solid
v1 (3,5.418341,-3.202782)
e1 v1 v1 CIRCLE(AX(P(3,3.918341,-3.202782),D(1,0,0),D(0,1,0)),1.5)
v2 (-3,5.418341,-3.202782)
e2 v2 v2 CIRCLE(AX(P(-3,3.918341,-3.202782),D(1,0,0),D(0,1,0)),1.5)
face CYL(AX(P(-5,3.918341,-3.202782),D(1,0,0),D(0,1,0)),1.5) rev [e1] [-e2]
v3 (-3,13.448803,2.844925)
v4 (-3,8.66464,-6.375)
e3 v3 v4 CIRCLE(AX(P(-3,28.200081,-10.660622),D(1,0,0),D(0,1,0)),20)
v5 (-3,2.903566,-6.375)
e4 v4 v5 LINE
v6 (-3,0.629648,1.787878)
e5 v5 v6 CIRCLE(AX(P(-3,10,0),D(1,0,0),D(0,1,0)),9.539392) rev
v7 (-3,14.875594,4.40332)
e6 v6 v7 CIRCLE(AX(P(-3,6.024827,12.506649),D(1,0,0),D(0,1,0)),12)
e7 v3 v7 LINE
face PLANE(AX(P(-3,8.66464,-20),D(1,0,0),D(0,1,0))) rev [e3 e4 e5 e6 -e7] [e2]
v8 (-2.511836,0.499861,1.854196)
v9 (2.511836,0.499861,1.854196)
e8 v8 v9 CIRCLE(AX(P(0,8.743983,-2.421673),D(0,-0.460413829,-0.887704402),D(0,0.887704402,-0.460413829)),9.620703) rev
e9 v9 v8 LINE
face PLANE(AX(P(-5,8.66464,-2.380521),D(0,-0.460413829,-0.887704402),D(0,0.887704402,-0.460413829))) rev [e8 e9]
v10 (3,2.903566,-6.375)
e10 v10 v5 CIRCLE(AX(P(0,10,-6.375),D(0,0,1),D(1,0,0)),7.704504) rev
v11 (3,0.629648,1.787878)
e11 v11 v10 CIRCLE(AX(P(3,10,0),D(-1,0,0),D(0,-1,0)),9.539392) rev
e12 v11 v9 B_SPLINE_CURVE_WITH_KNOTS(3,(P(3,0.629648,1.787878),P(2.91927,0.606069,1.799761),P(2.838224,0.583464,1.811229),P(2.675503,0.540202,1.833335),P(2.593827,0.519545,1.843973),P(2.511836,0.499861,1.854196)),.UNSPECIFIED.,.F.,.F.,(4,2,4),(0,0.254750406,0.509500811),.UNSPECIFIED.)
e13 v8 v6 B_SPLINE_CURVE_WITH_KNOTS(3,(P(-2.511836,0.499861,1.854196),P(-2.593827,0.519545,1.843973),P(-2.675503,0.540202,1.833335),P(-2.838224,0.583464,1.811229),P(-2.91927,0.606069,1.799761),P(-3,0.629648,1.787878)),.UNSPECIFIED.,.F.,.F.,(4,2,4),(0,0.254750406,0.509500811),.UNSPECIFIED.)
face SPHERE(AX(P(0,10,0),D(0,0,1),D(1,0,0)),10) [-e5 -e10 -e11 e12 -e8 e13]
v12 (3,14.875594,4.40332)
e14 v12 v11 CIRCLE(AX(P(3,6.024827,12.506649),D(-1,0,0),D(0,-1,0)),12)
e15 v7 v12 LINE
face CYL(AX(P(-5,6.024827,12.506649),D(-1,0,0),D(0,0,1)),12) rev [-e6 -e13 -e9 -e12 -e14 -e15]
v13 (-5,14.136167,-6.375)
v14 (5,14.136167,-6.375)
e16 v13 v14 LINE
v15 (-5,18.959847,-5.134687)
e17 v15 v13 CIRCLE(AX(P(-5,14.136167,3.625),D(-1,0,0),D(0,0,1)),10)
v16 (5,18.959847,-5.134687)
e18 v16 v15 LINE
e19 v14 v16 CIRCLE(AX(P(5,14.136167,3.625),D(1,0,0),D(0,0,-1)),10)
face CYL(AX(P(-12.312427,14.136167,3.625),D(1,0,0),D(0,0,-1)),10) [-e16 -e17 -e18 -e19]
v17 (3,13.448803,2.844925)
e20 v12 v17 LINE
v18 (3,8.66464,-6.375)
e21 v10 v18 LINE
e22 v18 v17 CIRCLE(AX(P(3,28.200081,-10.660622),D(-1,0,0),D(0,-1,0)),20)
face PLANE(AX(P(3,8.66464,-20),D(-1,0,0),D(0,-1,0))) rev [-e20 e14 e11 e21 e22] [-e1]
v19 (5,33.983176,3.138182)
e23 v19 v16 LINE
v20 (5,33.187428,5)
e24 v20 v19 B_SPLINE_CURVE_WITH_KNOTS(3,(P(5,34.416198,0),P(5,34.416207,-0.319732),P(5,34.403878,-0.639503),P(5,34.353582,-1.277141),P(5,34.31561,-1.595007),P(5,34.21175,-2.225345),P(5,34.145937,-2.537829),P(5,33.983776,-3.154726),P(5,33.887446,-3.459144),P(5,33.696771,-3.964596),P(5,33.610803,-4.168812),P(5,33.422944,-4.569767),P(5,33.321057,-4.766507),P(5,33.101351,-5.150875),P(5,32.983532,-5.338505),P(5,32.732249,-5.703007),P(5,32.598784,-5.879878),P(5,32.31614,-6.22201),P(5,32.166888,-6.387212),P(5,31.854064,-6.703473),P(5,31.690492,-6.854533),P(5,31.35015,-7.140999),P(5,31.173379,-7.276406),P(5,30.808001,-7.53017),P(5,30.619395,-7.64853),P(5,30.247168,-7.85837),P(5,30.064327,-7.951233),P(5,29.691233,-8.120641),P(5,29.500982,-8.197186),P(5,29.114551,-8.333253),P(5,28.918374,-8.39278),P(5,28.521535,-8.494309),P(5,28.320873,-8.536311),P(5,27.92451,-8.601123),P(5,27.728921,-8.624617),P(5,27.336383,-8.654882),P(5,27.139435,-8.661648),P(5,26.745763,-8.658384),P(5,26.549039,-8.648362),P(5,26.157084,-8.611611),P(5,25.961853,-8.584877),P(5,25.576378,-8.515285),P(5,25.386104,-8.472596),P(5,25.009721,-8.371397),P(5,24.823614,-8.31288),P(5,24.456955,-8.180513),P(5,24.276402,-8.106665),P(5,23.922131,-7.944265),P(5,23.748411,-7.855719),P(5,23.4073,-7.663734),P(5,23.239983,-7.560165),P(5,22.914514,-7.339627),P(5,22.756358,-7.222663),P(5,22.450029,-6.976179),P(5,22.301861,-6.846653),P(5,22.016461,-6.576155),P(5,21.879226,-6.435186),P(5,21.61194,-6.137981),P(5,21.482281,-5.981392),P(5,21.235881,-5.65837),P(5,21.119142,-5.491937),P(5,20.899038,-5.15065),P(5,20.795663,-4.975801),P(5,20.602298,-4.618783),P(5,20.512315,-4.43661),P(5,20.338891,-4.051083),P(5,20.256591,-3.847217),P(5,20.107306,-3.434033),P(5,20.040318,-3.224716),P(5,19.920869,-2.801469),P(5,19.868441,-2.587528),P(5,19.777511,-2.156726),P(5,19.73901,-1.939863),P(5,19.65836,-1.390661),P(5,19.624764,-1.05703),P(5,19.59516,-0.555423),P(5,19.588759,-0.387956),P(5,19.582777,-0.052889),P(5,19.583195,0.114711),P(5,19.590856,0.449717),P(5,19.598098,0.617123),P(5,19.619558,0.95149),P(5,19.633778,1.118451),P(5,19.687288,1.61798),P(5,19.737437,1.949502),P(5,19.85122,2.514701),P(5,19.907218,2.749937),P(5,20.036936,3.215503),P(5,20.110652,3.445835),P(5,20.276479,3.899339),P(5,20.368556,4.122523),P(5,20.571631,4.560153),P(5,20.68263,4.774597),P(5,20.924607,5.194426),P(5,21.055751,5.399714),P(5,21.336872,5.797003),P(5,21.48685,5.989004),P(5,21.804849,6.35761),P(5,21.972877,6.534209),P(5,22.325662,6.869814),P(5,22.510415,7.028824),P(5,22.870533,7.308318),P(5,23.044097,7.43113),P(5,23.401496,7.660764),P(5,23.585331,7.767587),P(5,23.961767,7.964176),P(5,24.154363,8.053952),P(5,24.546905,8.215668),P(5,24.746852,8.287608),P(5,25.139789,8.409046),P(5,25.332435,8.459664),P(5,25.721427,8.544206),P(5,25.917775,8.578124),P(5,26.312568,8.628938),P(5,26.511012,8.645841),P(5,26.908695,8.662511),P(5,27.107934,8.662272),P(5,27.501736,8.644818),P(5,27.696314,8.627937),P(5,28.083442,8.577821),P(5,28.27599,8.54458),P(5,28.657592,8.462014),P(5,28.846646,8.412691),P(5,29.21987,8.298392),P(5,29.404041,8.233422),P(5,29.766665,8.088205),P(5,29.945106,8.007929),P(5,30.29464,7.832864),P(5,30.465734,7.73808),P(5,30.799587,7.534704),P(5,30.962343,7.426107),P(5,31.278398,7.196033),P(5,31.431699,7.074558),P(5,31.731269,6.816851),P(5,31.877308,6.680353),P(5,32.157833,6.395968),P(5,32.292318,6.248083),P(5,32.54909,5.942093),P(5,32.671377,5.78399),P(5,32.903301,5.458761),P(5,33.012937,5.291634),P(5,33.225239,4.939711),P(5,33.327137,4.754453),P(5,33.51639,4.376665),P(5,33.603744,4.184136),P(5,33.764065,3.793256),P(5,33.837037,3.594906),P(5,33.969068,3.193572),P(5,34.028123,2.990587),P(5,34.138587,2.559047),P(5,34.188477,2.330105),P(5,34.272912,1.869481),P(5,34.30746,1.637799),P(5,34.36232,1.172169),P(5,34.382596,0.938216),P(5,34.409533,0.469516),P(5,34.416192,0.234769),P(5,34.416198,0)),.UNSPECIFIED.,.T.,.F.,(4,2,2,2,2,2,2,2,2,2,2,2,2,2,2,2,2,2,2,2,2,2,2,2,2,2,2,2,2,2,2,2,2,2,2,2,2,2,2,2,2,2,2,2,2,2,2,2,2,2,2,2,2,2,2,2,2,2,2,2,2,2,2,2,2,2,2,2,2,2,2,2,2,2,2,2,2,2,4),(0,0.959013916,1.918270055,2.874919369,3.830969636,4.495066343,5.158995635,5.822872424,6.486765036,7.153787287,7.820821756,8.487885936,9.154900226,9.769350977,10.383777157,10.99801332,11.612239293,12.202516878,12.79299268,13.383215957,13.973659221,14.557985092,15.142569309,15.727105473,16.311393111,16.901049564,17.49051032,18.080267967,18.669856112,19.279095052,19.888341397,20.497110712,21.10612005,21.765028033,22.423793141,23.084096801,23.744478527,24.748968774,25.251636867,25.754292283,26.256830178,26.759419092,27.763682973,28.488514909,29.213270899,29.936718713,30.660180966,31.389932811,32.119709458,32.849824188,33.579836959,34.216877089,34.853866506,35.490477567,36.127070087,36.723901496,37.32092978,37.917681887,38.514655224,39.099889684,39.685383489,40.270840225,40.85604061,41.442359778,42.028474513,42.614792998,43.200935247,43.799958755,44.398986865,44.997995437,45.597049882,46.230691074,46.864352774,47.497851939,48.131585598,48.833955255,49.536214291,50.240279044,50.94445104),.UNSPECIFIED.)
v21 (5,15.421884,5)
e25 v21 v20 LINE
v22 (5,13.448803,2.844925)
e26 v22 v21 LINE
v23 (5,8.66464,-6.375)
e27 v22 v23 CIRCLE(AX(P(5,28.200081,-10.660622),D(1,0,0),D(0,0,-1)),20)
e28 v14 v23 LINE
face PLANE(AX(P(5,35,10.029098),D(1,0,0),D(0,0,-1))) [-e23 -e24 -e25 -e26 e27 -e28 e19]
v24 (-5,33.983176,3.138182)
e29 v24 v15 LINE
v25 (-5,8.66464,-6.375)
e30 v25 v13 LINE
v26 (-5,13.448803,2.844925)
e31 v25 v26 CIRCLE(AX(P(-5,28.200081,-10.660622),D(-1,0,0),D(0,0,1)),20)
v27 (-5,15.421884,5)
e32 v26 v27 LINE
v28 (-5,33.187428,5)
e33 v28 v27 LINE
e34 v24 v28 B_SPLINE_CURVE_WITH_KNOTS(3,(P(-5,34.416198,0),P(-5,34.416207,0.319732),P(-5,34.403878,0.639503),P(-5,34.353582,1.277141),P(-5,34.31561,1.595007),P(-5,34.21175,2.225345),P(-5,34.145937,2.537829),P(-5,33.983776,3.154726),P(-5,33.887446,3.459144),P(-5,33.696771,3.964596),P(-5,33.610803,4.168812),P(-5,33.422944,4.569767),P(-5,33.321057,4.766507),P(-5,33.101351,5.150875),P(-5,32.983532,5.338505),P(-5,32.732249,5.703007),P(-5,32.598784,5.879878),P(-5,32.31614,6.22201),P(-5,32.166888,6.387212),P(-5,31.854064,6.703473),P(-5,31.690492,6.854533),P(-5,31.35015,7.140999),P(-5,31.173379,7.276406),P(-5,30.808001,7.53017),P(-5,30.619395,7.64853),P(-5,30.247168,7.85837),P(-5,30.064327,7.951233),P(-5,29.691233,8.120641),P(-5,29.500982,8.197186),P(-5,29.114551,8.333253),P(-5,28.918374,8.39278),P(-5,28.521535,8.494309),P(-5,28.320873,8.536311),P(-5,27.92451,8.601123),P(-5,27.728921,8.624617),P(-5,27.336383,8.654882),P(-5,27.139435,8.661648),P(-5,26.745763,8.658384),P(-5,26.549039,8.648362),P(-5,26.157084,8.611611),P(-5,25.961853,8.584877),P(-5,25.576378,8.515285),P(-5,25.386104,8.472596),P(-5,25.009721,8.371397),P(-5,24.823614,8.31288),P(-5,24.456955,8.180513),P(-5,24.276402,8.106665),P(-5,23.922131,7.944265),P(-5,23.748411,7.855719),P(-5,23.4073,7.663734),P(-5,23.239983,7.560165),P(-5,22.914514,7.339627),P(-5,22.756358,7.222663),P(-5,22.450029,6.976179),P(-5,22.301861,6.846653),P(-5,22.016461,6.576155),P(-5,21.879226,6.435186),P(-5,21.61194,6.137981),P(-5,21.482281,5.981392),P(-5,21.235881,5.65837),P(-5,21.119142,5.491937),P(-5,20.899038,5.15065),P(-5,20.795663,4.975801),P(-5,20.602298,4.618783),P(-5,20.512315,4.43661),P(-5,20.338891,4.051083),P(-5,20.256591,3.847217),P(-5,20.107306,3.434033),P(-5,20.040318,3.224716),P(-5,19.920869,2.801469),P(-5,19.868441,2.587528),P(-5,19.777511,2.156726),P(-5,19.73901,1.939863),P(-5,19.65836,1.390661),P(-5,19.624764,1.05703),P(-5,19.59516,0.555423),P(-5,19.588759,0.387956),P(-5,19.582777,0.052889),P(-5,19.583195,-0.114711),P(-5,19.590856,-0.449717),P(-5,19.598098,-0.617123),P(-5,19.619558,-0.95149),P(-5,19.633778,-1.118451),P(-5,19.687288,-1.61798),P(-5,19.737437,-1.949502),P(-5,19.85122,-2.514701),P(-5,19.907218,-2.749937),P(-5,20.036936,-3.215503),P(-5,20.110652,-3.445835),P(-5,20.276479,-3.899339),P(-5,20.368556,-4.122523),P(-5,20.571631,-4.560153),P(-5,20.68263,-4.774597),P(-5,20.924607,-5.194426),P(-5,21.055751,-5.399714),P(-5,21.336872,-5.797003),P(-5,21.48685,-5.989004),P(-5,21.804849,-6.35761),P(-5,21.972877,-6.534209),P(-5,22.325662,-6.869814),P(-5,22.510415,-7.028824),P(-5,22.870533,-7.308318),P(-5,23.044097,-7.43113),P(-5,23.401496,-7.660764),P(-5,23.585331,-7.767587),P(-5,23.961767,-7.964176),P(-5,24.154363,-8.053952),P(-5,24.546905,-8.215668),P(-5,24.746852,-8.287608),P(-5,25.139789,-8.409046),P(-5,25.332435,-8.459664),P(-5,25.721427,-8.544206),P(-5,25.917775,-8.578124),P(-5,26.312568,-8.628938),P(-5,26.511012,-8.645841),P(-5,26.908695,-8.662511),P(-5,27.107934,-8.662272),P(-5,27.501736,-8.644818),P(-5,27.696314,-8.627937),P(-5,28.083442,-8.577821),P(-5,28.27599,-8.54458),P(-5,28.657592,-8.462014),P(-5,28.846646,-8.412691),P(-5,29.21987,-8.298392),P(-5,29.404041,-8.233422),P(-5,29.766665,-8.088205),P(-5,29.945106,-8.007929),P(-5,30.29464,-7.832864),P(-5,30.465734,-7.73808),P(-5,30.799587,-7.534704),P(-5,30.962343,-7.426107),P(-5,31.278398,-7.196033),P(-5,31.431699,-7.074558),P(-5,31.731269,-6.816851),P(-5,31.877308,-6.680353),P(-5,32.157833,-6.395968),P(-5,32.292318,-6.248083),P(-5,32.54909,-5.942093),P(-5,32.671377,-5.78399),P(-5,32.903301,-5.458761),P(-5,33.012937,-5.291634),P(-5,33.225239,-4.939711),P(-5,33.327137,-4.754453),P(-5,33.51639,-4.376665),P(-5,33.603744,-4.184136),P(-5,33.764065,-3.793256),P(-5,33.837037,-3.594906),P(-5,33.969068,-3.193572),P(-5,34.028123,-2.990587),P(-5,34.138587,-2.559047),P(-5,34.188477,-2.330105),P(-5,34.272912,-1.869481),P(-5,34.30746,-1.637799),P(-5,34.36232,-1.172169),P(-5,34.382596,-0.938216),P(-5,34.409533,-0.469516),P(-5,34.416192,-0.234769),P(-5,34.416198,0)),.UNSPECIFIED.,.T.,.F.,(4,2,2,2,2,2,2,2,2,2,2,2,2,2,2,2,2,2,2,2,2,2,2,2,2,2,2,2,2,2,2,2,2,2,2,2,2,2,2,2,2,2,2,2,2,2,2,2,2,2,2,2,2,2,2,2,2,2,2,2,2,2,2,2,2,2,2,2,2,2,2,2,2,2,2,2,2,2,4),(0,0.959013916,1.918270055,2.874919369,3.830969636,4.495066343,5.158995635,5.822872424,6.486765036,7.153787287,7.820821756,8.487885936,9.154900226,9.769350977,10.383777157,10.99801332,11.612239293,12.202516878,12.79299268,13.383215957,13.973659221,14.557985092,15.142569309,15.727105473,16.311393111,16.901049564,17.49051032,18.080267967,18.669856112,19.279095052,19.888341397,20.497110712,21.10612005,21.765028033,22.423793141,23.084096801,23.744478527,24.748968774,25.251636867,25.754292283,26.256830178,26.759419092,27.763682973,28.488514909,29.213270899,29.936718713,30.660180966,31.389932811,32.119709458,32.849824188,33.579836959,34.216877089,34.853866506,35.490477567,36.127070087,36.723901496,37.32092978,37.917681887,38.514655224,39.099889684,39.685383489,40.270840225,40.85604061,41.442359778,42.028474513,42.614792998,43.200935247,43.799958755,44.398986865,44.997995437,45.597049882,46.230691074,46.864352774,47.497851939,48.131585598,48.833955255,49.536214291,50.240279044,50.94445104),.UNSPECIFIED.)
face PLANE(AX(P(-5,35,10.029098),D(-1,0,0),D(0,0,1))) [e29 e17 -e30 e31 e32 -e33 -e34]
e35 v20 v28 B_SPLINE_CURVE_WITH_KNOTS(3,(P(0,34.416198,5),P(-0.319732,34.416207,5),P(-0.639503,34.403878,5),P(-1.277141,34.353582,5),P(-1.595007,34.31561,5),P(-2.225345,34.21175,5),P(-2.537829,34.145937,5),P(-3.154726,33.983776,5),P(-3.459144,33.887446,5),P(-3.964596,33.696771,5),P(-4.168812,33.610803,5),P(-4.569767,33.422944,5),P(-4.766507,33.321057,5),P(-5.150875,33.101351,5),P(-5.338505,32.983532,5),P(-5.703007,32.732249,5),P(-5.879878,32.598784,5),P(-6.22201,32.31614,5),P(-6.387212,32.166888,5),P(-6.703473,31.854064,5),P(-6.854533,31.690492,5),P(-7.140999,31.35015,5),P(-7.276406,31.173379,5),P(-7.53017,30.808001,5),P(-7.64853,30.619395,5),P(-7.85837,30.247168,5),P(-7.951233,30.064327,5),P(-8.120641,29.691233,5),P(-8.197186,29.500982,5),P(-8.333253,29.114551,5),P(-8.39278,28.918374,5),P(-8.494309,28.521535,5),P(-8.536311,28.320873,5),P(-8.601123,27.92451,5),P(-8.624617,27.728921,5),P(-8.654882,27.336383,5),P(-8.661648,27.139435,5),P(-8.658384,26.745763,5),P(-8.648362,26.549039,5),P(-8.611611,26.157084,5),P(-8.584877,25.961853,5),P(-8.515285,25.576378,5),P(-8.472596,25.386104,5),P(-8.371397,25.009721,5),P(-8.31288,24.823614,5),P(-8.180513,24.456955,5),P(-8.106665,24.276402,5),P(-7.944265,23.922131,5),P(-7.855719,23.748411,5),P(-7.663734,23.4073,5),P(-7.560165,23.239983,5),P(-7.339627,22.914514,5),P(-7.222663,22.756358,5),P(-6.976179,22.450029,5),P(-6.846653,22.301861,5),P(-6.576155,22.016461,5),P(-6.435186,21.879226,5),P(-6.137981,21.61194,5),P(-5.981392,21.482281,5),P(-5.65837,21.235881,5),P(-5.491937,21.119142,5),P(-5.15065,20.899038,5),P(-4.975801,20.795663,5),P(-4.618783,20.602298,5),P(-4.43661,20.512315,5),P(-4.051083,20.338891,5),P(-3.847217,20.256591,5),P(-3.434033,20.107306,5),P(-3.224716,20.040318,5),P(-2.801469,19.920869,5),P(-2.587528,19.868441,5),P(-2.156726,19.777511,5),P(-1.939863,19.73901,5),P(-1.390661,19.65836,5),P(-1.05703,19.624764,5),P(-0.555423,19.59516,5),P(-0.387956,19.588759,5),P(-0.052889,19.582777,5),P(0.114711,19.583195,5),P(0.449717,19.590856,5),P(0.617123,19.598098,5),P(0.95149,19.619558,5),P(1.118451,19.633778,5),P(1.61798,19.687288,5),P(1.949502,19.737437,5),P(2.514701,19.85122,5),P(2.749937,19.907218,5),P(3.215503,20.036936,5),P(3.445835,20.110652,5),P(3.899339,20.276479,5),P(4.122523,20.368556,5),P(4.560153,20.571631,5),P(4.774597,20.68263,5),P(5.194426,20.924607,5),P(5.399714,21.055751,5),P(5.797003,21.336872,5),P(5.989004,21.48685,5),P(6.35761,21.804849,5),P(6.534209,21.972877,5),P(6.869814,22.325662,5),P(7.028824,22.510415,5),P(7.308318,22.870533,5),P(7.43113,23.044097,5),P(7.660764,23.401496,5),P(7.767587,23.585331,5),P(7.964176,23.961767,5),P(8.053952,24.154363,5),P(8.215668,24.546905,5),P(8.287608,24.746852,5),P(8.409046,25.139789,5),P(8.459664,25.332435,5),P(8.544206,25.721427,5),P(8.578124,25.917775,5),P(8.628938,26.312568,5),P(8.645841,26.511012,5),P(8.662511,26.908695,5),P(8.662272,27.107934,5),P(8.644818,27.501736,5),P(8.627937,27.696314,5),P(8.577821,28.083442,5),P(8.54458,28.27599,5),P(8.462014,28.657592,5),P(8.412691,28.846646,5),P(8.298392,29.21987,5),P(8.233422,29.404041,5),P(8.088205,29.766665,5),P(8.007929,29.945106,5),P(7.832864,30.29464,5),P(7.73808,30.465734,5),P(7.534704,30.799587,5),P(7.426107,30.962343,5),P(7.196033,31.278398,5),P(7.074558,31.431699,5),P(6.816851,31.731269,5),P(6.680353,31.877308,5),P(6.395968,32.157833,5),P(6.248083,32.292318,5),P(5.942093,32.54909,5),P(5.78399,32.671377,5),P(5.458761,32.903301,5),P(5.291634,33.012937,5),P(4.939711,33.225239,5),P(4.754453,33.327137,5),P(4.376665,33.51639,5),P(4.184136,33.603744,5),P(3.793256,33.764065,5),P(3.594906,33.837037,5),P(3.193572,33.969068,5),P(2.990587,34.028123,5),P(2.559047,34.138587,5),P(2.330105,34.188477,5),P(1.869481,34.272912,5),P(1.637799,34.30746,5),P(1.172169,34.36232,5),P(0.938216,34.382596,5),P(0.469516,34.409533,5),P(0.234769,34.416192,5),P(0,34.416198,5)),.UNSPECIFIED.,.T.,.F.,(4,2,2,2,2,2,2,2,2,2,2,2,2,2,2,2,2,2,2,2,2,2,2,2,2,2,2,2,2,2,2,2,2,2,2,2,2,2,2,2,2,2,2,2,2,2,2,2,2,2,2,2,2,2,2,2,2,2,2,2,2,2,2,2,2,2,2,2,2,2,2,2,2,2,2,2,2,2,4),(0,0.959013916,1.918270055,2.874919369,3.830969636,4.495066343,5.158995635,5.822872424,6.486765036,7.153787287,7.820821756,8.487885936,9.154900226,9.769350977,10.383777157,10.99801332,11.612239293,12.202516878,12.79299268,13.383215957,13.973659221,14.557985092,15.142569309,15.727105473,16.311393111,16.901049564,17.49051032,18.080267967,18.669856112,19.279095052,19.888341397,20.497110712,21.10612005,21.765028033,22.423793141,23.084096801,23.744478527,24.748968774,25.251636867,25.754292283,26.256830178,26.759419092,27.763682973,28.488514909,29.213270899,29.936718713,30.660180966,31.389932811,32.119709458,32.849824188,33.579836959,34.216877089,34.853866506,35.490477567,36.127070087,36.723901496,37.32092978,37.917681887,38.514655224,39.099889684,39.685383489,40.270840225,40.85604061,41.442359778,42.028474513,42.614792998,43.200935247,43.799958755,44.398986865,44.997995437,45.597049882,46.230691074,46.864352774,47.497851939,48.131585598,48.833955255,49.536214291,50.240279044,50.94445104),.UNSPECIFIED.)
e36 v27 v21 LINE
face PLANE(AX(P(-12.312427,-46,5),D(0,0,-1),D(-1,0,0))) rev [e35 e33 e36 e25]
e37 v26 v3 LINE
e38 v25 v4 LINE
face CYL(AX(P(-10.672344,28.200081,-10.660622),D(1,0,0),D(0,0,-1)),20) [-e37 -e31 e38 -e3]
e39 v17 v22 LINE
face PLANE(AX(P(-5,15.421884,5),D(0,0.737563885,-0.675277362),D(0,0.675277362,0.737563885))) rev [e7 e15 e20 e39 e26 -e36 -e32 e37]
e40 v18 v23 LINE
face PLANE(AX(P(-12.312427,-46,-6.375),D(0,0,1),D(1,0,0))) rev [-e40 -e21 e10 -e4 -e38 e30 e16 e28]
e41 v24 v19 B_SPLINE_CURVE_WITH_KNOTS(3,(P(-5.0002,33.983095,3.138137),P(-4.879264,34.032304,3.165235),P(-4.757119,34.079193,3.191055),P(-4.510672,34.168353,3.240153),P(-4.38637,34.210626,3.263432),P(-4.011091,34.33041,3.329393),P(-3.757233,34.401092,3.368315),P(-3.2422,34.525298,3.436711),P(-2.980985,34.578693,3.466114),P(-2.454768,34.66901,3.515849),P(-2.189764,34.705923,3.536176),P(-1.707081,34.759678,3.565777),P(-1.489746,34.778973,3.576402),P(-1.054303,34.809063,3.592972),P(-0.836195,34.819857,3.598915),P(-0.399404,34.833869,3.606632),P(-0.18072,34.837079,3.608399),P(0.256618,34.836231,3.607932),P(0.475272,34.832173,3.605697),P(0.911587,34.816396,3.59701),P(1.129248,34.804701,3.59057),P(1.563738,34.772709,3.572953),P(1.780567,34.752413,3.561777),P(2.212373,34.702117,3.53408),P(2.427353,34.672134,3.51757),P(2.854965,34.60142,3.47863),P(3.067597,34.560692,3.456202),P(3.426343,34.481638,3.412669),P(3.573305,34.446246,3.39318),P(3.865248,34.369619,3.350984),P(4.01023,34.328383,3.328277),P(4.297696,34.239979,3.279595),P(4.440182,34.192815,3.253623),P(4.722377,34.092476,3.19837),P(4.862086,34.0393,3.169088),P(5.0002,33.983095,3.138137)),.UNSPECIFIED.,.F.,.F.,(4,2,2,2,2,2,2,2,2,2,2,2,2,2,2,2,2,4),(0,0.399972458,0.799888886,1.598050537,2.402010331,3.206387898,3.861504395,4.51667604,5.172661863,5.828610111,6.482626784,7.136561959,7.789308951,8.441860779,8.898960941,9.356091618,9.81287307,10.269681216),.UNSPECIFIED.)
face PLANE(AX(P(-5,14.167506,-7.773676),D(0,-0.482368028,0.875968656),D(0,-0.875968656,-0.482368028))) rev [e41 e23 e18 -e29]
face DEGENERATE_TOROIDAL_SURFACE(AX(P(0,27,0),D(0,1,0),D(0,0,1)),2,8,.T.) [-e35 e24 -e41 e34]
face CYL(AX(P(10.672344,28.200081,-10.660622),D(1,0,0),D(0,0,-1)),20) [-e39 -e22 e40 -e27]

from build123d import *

# Parameters (mm, degrees)
SKETCH1_R           = 10
EXTRUDE1_DEPTH      = 35
FILLET1_R           = 10
FILLET_1_R          = 8
SKETCH2_W           = 7.672344266
SKETCH2_H           = 13.422166089
EXTRUDE2_DEPTH      = 20
SKETCH5_W           = 6.488658855
SKETCH5_H           = 20.959398048
EXTRUDE4_DEPTH      = 38.749172176
SKETCH7_W           = 24.373627343
SKETCH7_H           = 7.918162835
SKETCH7_H_2         = 6.543162835
EXTRUDE6_DEPTH      = 46
SKETCH10_R          = 1.5
CUT_EXTRUDE2_DEPTH  = 37.464237757
CUT_EXTRUDE3_DEPTH  = 37.954575301
FILLET2_START       = -3
FILLET2_OUTLINE_R   = 1.5
FILLET2_DEPTH       = 6
FILLET3_R           = 20
CUT_EXTRUDE_1_DEPTH = 37.954575301
FILLET_2_R          = 10


with BuildPart() as part:
    # Sketch1 → Extrude1 (new body)
    with BuildSketch(Plane(origin=(0, 0, 0), x_dir=(1, 0, 0), z_dir=(0, 1, 0))):
        with Locations(Location((0, 0, 0), (0, 0, 270))):
            Circle(SKETCH1_R)
    extrude(amount=EXTRUDE1_DEPTH)

    # Fillet1
    fillet1_edges = [part.edges().sort_by_distance(p)[0] for p in [
        (0, 0, -10),
    ]]
    fillet(fillet1_edges, radius=FILLET1_R)

    # Скругление1
    fillet_1_edges = [part.edges().sort_by_distance(p)[0] for p in [
        (0, 35, -10),
    ]]
    fillet(fillet_1_edges, radius=FILLET_1_R)

    # Sketch2 → Extrude2 (cut, symmetric)
    with BuildSketch(Plane.XY):
        with Locations((6.836172133, 1.953557325)):
            Rectangle(SKETCH2_W, SKETCH2_H)
        with Locations((-6.836172133, 1.953557325)):
            Rectangle(SKETCH2_W, SKETCH2_H)
    extrude(amount=EXTRUDE2_DEPTH, both=True, mode=Mode.SUBTRACT)

    # Sketch5 → Extrude4 (cut, through all)
    with BuildSketch(Plane(origin=(0, 0, 0), x_dir=(1, 0, 0), z_dir=(0, 1, 0))):
        with Locations((8.244329428, 0.450601309)):
            Rectangle(SKETCH5_W, SKETCH5_H)
        with Locations((-8.244329428, 0.450601309)):
            Rectangle(SKETCH5_W, SKETCH5_H)
    extrude(amount=EXTRUDE4_DEPTH, mode=Mode.SUBTRACT)

    # Sketch7 → Extrude6 (cut, symmetric)
    with BuildSketch(Plane(origin=(0, 0, 0), x_dir=(1, 0, 0), z_dir=(0, 1, 0))):
        with Locations((-0.125613483, -8.959081418)):
            Rectangle(SKETCH7_W, SKETCH7_H)
        with Locations((-0.125613483, 9.646581418)):
            Rectangle(SKETCH7_W, SKETCH7_H_2)
    extrude(amount=EXTRUDE6_DEPTH, both=True, mode=Mode.SUBTRACT)

    # Sketch10 → Cut-Extrude2 (cut, through all)
    with BuildSketch(Plane(origin=(3, 0, 0), x_dir=(0, 0, -1), z_dir=(1, 0, 0))):
        with Locations(Location((3.202782465, 3.918341245, 0), (0, 0, 90))):
            Circle(SKETCH10_R)
    extrude(amount=-CUT_EXTRUDE2_DEPTH, mode=Mode.SUBTRACT)

    # Sketch12 → Cut-Extrude3 (cut, through all)
    with BuildSketch(Plane(origin=(5, 0, 0), x_dir=(0, 0, -1), z_dir=(1, 0, 0))):
        Polygon((-5, 15.421884283), (2.380521482, 8.664640369), (-3.375305401, -2.43292564), (-5, -2.43292564), align=None)
    extrude(amount=-CUT_EXTRUDE3_DEPTH, mode=Mode.SUBTRACT)

    # Fillet2: read off the stored shape, not the designer's step
    # Fillet2 outline → Fillet2 (add)
    with BuildSketch(Plane.YZ.offset(FILLET2_START)):
        with BuildLine():
            ThreePointArc((0.62964824, 1.787878044), (0.810500421, -2.559901853), (2.903566036, -6.375))
            Line((2.903566036, -6.375), (8.664640369, -6.375))
            Line((8.664640369, -6.375), (8.664640369, -2.380521482))
            Line((8.664640369, -2.380521482), (14.875593683, 4.403320413))
            ThreePointArc((14.875593683, 4.403320413), (8.191715719, 0.703912056), (0.62964824, 1.787878044))
        make_face()
        with Locations((3.918341245, -3.202782465)):
            Circle(FILLET2_OUTLINE_R, mode=Mode.SUBTRACT)
    extrude(amount=FILLET2_DEPTH)

    # Fillet3
    # the kernel refuses this fillet: 20 mm, written as the material it takes off along each edge
    with BuildSketch(Plane(origin=(14.71184435, 8.664640369, -2.380521482), x_dir=(0, 0.6752773616828561, 0.7375638852320802), z_dir=(-1, 0, 0))) as fillet3_piece_1_section:
        with BuildLine():
            CenterArc((7.08473774, 20), FILLET3_R, 239.897661879, 30.102338121)
            Line((-2.946183095, 2.697380915), (-3.146801512, 2.351328533))
            ThreePointArc((-3.146801512, 2.351328533), (-1.743202492, 1.053664903), (-0.270110945, -0.295025554))
            Line((-0.270110945, -0.295025554), (0, -0.4))
            Line((0, -0.4), (7.08473774, -0.4))
            Line((7.08473774, -0.4), (7.08473774, 0))
        make_face()
    fillet3_piece_1 = extrude(amount=37.423688699, mode=Mode.PRIVATE)
    fillet3_piece_1 = split(fillet3_piece_1, bisect_by=Plane(origin=(3, 8.664640369, -2.380521482), z_dir=(1, 0, 0)), keep=Keep.TOP, mode=Mode.PRIVATE)
    add(fillet3_piece_1, mode=Mode.SUBTRACT)
    with BuildSketch(Plane(origin=(-3, 8.664640369, -2.380521482), x_dir=(0, 0.6752773616828561, 0.7375638852320802), z_dir=(-1, 0, 0)), Plane(origin=(22.71184435, 8.664640369, -2.380521482), x_dir=(0, 0.6752773616828562, 0.7375638852320802), z_dir=(-1, 0, 0))) as fillet3_piece_2:
        with BuildLine():
            CenterArc((7.08473774, 20), FILLET3_R, 239.897661879, 30.102338121)
            Line((-2.946183095, 2.697380915), (-3.146801512, 2.351328533))
            ThreePointArc((-3.146801512, 2.351328533), (-1.743202492, 1.053664903), (-0.270110945, -0.295025554))
            Line((-0.270110945, -0.295025554), (0, -0.4))
            Line((0, -0.4), (7.08473774, -0.4))
            Line((7.08473774, -0.4), (7.08473774, 0))
        make_face()
    extrude(amount=19.71184435, mode=Mode.SUBTRACT)
    with BuildSketch(Plane(origin=(22.71184435, 8.664640369, -2.380521482), x_dir=(0, 0.6752773616828562, 0.7375638852320802), z_dir=(-1, 0, 0))) as fillet3_piece_3_section:
        with BuildLine():
            CenterArc((7.08473774, 20), FILLET3_R, 239.897661879, 30.102338121)
            Line((-2.946183095, 2.697380915), (-3.146801512, 2.351328533))
            ThreePointArc((-3.146801512, 2.351328533), (-1.743202492, 1.053664903), (-0.270110945, -0.295025554))
            Line((-0.270110945, -0.295025554), (0, -0.4))
            Line((0, -0.4), (7.08473774, -0.4))
            Line((7.08473774, -0.4), (7.08473774, 0))
        make_face()
    fillet3_piece_3 = extrude(amount=37.423688699, mode=Mode.PRIVATE)
    fillet3_piece_3 = split(fillet3_piece_3, bisect_by=Plane(origin=(-3, 8.664640369, -2.380521482), z_dir=(-1, 0, 0)), keep=Keep.TOP, mode=Mode.PRIVATE)
    add(fillet3_piece_3, mode=Mode.SUBTRACT)

    # Эскиз1 → Вырез-Вытянуть1 (cut, through all)
    with BuildSketch(Plane(origin=(5, 0, 0), x_dir=(0, 0, -1), z_dir=(1, 0, 0))):
        Polygon((-4.197009704, 35.90598138), (7.773675874, 35.90598138), (7.773675874, 14.167506287), align=None)
    extrude(amount=-CUT_EXTRUDE_1_DEPTH, mode=Mode.SUBTRACT)

    # Скругление2
    fillet_2_edges = [part.edges().sort_by_distance(p)[0] for p in [
        (-1.1e-08, 16.707467799, -6.375),
    ]]
    fillet(fillet_2_edges, radius=FILLET_2_R)


solid = part.part
